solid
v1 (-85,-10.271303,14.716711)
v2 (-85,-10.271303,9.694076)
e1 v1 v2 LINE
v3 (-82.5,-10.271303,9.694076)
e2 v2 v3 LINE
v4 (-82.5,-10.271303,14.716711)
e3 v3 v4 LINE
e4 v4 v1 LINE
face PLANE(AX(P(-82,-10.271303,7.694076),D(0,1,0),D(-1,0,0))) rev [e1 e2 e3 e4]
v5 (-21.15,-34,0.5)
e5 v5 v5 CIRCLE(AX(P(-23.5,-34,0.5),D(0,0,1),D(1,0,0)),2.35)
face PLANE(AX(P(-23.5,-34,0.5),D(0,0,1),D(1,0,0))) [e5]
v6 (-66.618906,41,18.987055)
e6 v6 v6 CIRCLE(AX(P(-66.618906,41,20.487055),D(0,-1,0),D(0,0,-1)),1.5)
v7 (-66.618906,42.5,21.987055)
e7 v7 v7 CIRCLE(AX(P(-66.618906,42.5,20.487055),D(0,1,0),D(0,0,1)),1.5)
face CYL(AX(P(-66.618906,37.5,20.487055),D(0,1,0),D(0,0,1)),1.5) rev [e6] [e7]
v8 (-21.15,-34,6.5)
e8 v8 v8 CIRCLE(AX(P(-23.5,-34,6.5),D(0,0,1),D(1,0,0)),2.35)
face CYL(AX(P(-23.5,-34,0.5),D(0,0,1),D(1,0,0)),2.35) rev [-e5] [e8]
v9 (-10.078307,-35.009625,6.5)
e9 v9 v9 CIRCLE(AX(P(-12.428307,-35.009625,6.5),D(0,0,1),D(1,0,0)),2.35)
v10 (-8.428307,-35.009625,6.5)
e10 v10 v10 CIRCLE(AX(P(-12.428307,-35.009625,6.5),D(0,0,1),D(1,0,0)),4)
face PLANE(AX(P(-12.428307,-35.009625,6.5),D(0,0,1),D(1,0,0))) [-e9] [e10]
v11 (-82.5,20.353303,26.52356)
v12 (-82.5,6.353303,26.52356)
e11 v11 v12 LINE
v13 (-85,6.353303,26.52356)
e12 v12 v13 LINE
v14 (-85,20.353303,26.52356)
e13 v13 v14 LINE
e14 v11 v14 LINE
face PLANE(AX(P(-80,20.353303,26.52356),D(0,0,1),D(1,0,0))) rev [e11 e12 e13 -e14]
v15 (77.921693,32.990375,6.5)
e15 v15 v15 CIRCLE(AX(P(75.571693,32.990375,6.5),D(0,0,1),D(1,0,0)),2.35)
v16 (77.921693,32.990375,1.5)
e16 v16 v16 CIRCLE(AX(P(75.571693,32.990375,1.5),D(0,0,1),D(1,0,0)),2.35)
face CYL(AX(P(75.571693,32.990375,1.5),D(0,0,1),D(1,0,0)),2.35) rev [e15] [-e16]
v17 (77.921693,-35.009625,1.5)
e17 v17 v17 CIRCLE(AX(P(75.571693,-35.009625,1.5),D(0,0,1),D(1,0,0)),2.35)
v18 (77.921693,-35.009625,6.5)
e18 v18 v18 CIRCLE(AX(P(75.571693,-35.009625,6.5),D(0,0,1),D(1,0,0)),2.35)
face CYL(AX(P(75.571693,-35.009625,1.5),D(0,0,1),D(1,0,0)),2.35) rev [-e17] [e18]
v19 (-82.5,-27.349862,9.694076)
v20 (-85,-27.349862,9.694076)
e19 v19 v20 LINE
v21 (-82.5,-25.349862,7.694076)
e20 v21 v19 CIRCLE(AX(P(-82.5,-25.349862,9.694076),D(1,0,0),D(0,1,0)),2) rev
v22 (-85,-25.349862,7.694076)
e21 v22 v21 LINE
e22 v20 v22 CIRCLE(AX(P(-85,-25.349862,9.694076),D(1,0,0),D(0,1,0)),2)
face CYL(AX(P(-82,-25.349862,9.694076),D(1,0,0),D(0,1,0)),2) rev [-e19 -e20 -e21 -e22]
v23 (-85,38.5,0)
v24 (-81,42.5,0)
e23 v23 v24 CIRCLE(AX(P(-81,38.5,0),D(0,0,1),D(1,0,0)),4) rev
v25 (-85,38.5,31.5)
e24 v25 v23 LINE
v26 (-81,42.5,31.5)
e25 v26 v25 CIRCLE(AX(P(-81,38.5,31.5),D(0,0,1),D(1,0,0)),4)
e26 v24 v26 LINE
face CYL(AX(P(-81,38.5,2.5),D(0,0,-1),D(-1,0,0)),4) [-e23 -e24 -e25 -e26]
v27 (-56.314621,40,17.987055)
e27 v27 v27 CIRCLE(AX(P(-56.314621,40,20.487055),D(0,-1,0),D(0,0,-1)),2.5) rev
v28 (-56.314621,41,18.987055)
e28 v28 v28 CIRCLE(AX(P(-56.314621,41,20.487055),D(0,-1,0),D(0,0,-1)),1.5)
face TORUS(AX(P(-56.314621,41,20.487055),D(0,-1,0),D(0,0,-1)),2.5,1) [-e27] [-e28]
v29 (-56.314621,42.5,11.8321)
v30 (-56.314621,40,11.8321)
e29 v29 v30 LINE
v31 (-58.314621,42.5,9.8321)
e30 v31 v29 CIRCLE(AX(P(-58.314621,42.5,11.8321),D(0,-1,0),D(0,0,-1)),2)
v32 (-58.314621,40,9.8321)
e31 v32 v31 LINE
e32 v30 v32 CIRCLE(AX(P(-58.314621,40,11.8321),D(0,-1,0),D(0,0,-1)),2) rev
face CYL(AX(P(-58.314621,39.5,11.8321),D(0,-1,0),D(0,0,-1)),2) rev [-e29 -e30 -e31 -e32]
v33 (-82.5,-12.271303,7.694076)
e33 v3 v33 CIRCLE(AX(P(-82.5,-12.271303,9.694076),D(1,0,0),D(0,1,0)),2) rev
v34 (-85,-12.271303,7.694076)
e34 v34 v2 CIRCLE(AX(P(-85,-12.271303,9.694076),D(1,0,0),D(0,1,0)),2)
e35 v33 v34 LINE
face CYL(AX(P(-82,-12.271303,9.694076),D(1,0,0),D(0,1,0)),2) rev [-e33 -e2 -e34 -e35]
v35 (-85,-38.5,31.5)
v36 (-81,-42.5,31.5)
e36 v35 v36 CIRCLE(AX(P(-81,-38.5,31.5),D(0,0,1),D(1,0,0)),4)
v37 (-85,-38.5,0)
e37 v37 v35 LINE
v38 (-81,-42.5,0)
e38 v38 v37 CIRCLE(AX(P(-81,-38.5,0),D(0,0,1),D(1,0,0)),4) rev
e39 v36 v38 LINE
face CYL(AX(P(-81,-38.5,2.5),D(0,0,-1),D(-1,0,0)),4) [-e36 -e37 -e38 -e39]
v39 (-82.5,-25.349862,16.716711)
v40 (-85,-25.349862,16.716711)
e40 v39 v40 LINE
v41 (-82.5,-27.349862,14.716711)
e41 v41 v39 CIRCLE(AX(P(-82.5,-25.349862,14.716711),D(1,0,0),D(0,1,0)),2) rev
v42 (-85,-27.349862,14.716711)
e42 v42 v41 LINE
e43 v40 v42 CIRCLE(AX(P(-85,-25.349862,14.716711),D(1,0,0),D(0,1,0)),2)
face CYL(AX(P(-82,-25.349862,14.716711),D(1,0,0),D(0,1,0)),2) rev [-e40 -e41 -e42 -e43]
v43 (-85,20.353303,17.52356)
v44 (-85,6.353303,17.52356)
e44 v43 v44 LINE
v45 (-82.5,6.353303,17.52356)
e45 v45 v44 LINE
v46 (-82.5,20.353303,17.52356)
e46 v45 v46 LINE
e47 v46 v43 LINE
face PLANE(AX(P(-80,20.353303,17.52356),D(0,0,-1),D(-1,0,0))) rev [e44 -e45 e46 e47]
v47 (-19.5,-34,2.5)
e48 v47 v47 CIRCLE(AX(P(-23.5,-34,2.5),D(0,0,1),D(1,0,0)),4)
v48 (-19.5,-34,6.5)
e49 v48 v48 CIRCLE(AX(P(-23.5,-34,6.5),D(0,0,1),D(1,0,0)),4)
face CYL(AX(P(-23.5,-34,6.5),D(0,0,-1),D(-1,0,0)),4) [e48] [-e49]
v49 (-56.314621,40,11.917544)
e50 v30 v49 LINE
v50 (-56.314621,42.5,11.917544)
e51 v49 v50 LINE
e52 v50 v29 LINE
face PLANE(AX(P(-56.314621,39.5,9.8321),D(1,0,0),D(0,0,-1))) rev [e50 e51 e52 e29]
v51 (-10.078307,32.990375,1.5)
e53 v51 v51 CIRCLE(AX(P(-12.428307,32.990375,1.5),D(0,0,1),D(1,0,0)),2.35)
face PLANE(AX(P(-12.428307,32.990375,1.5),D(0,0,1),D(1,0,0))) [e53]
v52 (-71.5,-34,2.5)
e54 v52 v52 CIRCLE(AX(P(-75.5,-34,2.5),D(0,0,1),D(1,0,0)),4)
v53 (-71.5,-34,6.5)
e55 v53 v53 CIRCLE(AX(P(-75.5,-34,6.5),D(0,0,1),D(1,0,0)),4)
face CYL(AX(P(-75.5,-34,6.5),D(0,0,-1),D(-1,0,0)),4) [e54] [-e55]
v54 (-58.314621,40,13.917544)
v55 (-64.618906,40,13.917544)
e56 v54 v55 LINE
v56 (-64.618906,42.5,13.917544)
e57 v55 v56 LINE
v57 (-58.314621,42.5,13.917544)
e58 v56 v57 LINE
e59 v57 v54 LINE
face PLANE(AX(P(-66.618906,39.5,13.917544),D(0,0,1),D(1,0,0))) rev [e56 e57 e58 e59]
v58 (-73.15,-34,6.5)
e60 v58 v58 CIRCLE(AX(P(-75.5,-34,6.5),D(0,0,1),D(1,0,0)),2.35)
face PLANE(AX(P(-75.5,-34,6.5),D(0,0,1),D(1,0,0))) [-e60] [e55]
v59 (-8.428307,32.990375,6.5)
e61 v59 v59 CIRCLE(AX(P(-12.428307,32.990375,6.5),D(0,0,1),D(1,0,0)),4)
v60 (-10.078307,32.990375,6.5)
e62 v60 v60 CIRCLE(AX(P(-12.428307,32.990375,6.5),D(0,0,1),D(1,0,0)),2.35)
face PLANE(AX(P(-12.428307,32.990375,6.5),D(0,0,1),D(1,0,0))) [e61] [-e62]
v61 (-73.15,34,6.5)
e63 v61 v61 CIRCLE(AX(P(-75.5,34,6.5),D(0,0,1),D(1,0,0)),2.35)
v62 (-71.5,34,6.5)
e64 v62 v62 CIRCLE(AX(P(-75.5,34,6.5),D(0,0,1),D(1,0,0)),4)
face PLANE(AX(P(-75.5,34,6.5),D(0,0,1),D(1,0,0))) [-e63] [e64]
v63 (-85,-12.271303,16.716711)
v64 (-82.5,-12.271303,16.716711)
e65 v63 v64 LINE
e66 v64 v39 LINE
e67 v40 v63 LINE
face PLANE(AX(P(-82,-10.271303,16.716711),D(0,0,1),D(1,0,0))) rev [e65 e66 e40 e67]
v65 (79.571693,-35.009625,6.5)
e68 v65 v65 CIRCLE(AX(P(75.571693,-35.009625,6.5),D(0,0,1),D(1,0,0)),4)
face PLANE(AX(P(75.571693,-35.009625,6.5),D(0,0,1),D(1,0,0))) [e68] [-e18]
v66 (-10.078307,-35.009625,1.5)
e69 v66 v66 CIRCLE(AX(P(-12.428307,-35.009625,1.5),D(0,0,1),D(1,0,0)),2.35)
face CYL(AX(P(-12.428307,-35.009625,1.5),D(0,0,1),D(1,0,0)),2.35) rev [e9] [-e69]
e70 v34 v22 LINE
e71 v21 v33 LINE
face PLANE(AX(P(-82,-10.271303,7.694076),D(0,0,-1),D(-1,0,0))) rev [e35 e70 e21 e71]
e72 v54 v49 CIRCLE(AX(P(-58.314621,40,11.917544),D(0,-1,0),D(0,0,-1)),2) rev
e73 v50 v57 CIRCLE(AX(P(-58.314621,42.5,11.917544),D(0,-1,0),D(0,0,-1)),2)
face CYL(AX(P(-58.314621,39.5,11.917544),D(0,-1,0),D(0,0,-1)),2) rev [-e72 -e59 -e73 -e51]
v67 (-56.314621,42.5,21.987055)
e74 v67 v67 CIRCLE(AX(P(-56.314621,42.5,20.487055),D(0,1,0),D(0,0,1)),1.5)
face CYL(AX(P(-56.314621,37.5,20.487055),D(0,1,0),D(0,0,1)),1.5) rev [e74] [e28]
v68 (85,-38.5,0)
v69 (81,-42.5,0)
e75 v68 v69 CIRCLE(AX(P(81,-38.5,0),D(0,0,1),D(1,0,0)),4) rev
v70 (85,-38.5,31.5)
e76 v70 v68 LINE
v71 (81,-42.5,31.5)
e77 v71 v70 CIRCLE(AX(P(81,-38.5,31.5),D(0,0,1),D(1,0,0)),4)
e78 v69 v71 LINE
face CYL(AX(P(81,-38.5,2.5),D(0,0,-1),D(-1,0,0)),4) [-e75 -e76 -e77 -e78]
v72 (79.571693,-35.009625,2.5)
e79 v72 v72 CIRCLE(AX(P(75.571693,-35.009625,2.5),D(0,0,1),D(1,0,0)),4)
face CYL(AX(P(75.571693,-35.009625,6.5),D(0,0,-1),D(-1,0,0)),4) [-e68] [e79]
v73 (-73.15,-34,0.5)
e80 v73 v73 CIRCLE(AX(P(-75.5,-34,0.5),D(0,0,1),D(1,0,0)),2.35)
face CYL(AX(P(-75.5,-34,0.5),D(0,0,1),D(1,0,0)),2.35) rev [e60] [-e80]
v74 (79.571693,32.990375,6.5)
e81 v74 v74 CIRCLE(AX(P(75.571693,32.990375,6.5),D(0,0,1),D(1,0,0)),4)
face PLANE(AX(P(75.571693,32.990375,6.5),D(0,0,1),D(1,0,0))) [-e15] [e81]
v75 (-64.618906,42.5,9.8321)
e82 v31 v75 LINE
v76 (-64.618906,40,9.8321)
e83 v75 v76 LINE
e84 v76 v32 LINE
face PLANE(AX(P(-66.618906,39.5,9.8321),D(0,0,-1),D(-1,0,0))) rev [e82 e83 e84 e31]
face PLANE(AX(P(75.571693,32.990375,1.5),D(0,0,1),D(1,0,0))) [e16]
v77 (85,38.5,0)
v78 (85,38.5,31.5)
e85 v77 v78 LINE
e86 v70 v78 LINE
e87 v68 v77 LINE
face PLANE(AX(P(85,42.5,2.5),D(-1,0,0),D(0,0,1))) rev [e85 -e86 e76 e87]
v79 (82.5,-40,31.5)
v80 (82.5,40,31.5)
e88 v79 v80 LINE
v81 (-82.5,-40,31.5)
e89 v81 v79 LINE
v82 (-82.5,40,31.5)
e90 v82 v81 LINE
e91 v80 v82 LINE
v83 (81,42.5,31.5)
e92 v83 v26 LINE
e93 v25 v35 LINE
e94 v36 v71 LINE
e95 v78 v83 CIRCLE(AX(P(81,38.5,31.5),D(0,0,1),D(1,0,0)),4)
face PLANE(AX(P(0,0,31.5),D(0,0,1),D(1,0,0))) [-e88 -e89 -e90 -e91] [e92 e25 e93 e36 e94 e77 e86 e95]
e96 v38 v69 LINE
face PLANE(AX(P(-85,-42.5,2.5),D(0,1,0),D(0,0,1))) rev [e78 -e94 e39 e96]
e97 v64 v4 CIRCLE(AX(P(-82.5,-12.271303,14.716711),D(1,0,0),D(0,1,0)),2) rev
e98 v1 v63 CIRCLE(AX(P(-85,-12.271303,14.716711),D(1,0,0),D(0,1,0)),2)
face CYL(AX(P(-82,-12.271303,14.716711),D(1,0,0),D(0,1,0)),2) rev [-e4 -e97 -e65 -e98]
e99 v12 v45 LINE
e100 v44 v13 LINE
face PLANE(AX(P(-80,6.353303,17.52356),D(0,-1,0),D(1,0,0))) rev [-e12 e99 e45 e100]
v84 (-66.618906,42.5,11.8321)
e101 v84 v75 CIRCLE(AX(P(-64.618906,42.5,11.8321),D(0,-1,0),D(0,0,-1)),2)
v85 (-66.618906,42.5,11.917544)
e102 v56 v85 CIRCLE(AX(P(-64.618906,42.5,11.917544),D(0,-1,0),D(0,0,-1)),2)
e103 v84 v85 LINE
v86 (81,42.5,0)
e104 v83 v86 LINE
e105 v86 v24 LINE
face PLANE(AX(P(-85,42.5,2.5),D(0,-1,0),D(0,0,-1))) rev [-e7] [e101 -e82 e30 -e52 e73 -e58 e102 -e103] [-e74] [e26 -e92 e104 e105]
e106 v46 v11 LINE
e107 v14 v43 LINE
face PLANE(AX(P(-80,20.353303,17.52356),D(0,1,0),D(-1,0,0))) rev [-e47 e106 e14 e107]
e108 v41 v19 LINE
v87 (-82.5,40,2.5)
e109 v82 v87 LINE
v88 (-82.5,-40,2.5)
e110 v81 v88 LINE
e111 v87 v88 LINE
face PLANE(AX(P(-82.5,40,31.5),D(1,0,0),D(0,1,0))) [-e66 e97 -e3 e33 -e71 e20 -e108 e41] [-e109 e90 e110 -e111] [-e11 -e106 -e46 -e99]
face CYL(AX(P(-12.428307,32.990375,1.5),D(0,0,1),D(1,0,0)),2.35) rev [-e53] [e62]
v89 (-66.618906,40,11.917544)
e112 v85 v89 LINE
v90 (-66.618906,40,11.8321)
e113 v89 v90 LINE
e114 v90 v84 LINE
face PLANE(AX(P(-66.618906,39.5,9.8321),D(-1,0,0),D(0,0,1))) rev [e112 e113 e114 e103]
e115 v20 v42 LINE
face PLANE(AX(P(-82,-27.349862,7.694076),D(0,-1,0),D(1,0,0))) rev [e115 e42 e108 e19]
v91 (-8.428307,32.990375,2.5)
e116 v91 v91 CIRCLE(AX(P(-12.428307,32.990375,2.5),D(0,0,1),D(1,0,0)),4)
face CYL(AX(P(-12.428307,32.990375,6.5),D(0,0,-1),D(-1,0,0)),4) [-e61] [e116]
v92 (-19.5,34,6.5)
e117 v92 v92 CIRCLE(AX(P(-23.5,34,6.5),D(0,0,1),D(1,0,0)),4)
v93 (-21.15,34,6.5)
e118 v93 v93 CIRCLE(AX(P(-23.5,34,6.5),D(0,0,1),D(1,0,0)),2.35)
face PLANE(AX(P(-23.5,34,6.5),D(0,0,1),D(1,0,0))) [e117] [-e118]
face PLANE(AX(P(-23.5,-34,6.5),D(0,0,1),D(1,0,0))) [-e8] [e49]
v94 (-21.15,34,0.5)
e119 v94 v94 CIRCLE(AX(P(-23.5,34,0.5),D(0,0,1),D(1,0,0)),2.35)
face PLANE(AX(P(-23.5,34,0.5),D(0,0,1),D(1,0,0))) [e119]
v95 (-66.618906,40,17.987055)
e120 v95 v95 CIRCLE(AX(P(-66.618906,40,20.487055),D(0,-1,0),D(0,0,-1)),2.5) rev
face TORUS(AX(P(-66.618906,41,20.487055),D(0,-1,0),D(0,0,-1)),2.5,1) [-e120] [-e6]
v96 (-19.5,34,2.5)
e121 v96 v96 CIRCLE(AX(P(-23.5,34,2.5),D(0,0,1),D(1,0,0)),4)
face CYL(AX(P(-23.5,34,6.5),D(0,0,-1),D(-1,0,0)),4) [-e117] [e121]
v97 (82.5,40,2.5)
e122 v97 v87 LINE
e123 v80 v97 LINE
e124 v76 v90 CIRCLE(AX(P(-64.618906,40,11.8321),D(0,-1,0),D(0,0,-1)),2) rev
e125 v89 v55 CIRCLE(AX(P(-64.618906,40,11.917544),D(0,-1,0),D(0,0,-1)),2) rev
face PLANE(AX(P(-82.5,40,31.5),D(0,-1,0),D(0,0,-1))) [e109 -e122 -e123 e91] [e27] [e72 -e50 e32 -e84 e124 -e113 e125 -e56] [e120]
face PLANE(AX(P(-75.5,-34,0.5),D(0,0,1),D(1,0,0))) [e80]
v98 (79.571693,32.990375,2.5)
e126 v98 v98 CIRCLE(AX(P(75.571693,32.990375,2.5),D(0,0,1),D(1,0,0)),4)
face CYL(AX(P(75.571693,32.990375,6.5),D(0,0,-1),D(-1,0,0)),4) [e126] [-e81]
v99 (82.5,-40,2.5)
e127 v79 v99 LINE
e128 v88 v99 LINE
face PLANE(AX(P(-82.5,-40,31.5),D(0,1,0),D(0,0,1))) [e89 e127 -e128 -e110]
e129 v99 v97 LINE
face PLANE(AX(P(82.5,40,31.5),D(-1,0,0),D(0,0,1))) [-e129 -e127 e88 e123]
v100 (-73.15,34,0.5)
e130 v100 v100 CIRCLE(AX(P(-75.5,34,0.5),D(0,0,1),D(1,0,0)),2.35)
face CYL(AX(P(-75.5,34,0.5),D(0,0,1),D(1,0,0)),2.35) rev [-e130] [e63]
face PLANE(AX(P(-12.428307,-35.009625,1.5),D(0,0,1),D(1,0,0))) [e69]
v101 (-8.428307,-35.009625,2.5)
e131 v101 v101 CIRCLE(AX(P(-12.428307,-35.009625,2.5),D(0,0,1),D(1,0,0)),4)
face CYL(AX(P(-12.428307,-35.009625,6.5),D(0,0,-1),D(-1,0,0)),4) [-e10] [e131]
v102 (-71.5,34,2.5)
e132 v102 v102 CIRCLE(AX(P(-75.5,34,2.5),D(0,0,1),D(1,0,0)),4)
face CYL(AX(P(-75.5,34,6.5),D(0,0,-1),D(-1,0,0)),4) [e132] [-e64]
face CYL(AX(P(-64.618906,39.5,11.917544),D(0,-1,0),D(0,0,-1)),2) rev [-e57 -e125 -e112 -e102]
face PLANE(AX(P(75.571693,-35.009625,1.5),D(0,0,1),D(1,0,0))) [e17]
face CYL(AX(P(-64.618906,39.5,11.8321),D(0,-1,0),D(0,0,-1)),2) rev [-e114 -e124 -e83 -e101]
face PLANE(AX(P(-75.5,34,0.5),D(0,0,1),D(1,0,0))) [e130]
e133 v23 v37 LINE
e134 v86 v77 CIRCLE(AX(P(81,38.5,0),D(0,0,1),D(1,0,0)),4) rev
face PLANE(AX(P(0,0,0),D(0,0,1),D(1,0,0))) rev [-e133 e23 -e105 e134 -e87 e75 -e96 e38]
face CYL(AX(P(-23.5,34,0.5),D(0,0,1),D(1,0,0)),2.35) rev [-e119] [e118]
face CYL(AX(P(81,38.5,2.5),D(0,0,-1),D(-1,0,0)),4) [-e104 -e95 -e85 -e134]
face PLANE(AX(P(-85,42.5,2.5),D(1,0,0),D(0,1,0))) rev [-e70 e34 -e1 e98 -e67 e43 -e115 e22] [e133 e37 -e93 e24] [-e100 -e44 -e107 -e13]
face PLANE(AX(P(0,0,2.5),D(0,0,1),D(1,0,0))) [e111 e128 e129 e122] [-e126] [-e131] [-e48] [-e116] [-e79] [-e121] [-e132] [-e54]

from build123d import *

# Parameters (mm, degrees)
SKETCH_1_W          = 170
SKETCH_1_H          = 85
EXTRUDE_1_DEPTH     = 2.5
SKETCH_2_W          = 170
SKETCH_2_H          = 85
SKETCH_2_W_2        = 165
SKETCH_2_H_2        = 80
EXTRUDE_1_2_DEPTH   = 29
SKETCH_3_R          = 4
EXTRUDE_2_DEPTH     = 4
SKETCH_4_R          = 2.35
CUT_EXTRUDE_1_DEPTH = 6
SKETCH_5_W          = 9.022635
SKETCH_5_H          = 17.078559106
CUT_EXTRUDE_2_DEPTH = 3
SKETCH_6_W          = 10.304284877
SKETCH_6_H          = 4.085444359
CUT_EXTRUDE_3_DEPTH = 3
FILLET_1_R          = 2
FILLET_2_R          = 2
EXTRUDE_START       = 2.5
EXTRUDE_3_OUTLINE_R = 4
EXTRUDE_3_DEPTH     = 4
SKETCH_8_R          = 2.35
CUT_EXTRUDE_4_DEPTH = 5
SKETCH_9_W          = 9
SKETCH_9_H          = 14
CUT_EXTRUDE_5_DEPTH = 5
FILLET_5_R          = 4
SKETCH_10_R         = 1.5
CUT_EXTRUDE_6_DEPTH = 5
FILLET_7_R          = 1
FILLET_8_R          = 1


# Read off the part's stored shape, not the designer's step: Бобышка-Вытянуть3
with BuildPart() as part:
    # Эскиз1 → Extrude 1 (new body)
    with BuildSketch(Plane.XY):
        Rectangle(SKETCH_1_W, SKETCH_1_H)
    extrude(amount=EXTRUDE_1_DEPTH)

    # Эскиз2 → Extrude 1 2 (add)
    with BuildSketch(Plane.XY.offset(2.5)):
        Rectangle(SKETCH_2_W, SKETCH_2_H)
        Rectangle(SKETCH_2_W_2, SKETCH_2_H_2, mode=Mode.SUBTRACT)
    extrude(amount=EXTRUDE_1_2_DEPTH)

    # Эскиз3 → Бобышка-Вытянуть2 (add)
    with BuildSketch(Plane.XY.offset(2.5)):
        with Locations((-75.5, 34)):
            Circle(SKETCH_3_R)
        with Locations((-23.5, 34)):
            Circle(SKETCH_3_R)
        with Locations((-23.5, -34)):
            Circle(SKETCH_3_R)
        with Locations((-75.5, -34)):
            Circle(SKETCH_3_R)
    extrude(amount=EXTRUDE_2_DEPTH)

    # Эскиз4 → Вырез-Вытянуть1 (cut)
    with BuildSketch(Plane.XY.offset(6.5)):
        with Locations((-75.5, 34)):
            Circle(SKETCH_4_R)
        with Locations((-23.5, 34)):
            Circle(SKETCH_4_R)
        with Locations((-75.5, -34)):
            Circle(SKETCH_4_R)
        with Locations((-23.5, -34)):
            Circle(SKETCH_4_R)
    extrude(amount=-CUT_EXTRUDE_1_DEPTH, mode=Mode.SUBTRACT)

    # Эскиз5 → Вырез-Вытянуть2 (cut)
    with BuildSketch(Plane.ZY.offset(85)):
        with Locations((12.205393393, -18.810582789)):
            Rectangle(SKETCH_5_W, SKETCH_5_H)
    extrude(amount=-CUT_EXTRUDE_2_DEPTH, mode=Mode.SUBTRACT)

    # Эскиз6 → Вырез-Вытянуть3 (cut)
    with BuildSketch(Plane(origin=(0, 42.5, 0), x_dir=(1, 0, 0), z_dir=(0, 1, 0))):
        with Locations((-61.466763375, -11.87482218)):
            Rectangle(SKETCH_6_W, SKETCH_6_H)
    extrude(amount=-CUT_EXTRUDE_3_DEPTH, mode=Mode.SUBTRACT)

    # Скругление1
    fillet_1_edges = [part.edges().sort_by_distance(p)[0] for p in [
        (-83.75, -27.349862342, 7.694075893),
        (-83.75, -10.271303236, 7.694075893),
        (-83.75, -10.271303236, 16.716710893),
        (-83.75, -27.349862342, 16.716710893),
    ]]
    fillet(fillet_1_edges, radius=FILLET_1_R)

    # Скругление2
    fillet_2_edges = [part.edges().sort_by_distance(p)[0] for p in [
        (-66.618905813, 41.25, 13.917544359),
        (-66.618905813, 41.25, 9.8321),
        (-56.314620936, 41.25, 9.8321),
        (-56.314620936, 41.25, 13.917544359),
    ]]
    fillet(fillet_2_edges, radius=FILLET_2_R)

    # Бобышка-Вытянуть3 outline → Бобышка-Вытянуть3 (add)
    with BuildSketch(Plane.XY.offset(EXTRUDE_START)):
        with Locations((-12.4283067, 32.990374872)):
            Circle(EXTRUDE_3_OUTLINE_R)
        with Locations((75.5716933, 32.990374872)):
            Circle(EXTRUDE_3_OUTLINE_R)
        with Locations((-12.4283067, -35.009625128)):
            Circle(EXTRUDE_3_OUTLINE_R)
        with Locations((75.5716933, -35.009625128)):
            Circle(EXTRUDE_3_OUTLINE_R)
    extrude(amount=EXTRUDE_3_DEPTH)

    # Эскиз8 → Вырез-Вытянуть4 (cut)
    with BuildSketch(Plane.XY.offset(6.5)):
        with Locations((-12.4283067, -35.009625128)):
            Circle(SKETCH_8_R)
        with Locations((75.5716933, -35.009625128)):
            Circle(SKETCH_8_R)
        with Locations((75.5716933, 32.990374872)):
            Circle(SKETCH_8_R)
        with Locations((-12.4283067, 32.990374872)):
            Circle(SKETCH_8_R)
    extrude(amount=-CUT_EXTRUDE_4_DEPTH, mode=Mode.SUBTRACT)

    # Эскиз9 → Вырез-Вытянуть5 (cut)
    with BuildSketch(Plane.ZY.offset(85)):
        with Locations((22.023559844, 13.353303456)):
            Rectangle(SKETCH_9_W, SKETCH_9_H)
    extrude(amount=-CUT_EXTRUDE_5_DEPTH, mode=Mode.SUBTRACT)

    # Скругление5
    fillet_5_edges = [part.edges().sort_by_distance(p)[0] for p in [
        (85, -42.5, 15.75),
        (-85, -42.5, 15.75),
        (-85, 42.5, 15.75),
        (85, 42.5, 15.75),
    ]]
    fillet(fillet_5_edges, radius=FILLET_5_R)

    # Эскиз10 → Вырез-Вытянуть6 (cut)
    with BuildSketch(Plane(origin=(0, 42.5, 0), x_dir=(1, 0, 0), z_dir=(0, 1, 0))):
        with Locations(Location((-66.618905813, -20.487054891, 0), (0, 0, 270))):
            Circle(SKETCH_10_R)
        with Locations(Location((-56.314620936, -20.487054891, 0), (0, 0, 270))):
            Circle(SKETCH_10_R)
    extrude(amount=-CUT_EXTRUDE_6_DEPTH, mode=Mode.SUBTRACT)

    # Скругление7
    fillet_7_edges = [part.edges().sort_by_distance(p)[0] for p in [
        (-56.314620936, 40, 18.987054891),
    ]]
    fillet(fillet_7_edges, radius=FILLET_7_R)

    # Скругление8
    fillet_8_edges = [part.edges().sort_by_distance(p)[0] for p in [
        (-66.618905813, 40, 18.987054891),
    ]]
    fillet(fillet_8_edges, radius=FILLET_8_R)


solid = part.part
